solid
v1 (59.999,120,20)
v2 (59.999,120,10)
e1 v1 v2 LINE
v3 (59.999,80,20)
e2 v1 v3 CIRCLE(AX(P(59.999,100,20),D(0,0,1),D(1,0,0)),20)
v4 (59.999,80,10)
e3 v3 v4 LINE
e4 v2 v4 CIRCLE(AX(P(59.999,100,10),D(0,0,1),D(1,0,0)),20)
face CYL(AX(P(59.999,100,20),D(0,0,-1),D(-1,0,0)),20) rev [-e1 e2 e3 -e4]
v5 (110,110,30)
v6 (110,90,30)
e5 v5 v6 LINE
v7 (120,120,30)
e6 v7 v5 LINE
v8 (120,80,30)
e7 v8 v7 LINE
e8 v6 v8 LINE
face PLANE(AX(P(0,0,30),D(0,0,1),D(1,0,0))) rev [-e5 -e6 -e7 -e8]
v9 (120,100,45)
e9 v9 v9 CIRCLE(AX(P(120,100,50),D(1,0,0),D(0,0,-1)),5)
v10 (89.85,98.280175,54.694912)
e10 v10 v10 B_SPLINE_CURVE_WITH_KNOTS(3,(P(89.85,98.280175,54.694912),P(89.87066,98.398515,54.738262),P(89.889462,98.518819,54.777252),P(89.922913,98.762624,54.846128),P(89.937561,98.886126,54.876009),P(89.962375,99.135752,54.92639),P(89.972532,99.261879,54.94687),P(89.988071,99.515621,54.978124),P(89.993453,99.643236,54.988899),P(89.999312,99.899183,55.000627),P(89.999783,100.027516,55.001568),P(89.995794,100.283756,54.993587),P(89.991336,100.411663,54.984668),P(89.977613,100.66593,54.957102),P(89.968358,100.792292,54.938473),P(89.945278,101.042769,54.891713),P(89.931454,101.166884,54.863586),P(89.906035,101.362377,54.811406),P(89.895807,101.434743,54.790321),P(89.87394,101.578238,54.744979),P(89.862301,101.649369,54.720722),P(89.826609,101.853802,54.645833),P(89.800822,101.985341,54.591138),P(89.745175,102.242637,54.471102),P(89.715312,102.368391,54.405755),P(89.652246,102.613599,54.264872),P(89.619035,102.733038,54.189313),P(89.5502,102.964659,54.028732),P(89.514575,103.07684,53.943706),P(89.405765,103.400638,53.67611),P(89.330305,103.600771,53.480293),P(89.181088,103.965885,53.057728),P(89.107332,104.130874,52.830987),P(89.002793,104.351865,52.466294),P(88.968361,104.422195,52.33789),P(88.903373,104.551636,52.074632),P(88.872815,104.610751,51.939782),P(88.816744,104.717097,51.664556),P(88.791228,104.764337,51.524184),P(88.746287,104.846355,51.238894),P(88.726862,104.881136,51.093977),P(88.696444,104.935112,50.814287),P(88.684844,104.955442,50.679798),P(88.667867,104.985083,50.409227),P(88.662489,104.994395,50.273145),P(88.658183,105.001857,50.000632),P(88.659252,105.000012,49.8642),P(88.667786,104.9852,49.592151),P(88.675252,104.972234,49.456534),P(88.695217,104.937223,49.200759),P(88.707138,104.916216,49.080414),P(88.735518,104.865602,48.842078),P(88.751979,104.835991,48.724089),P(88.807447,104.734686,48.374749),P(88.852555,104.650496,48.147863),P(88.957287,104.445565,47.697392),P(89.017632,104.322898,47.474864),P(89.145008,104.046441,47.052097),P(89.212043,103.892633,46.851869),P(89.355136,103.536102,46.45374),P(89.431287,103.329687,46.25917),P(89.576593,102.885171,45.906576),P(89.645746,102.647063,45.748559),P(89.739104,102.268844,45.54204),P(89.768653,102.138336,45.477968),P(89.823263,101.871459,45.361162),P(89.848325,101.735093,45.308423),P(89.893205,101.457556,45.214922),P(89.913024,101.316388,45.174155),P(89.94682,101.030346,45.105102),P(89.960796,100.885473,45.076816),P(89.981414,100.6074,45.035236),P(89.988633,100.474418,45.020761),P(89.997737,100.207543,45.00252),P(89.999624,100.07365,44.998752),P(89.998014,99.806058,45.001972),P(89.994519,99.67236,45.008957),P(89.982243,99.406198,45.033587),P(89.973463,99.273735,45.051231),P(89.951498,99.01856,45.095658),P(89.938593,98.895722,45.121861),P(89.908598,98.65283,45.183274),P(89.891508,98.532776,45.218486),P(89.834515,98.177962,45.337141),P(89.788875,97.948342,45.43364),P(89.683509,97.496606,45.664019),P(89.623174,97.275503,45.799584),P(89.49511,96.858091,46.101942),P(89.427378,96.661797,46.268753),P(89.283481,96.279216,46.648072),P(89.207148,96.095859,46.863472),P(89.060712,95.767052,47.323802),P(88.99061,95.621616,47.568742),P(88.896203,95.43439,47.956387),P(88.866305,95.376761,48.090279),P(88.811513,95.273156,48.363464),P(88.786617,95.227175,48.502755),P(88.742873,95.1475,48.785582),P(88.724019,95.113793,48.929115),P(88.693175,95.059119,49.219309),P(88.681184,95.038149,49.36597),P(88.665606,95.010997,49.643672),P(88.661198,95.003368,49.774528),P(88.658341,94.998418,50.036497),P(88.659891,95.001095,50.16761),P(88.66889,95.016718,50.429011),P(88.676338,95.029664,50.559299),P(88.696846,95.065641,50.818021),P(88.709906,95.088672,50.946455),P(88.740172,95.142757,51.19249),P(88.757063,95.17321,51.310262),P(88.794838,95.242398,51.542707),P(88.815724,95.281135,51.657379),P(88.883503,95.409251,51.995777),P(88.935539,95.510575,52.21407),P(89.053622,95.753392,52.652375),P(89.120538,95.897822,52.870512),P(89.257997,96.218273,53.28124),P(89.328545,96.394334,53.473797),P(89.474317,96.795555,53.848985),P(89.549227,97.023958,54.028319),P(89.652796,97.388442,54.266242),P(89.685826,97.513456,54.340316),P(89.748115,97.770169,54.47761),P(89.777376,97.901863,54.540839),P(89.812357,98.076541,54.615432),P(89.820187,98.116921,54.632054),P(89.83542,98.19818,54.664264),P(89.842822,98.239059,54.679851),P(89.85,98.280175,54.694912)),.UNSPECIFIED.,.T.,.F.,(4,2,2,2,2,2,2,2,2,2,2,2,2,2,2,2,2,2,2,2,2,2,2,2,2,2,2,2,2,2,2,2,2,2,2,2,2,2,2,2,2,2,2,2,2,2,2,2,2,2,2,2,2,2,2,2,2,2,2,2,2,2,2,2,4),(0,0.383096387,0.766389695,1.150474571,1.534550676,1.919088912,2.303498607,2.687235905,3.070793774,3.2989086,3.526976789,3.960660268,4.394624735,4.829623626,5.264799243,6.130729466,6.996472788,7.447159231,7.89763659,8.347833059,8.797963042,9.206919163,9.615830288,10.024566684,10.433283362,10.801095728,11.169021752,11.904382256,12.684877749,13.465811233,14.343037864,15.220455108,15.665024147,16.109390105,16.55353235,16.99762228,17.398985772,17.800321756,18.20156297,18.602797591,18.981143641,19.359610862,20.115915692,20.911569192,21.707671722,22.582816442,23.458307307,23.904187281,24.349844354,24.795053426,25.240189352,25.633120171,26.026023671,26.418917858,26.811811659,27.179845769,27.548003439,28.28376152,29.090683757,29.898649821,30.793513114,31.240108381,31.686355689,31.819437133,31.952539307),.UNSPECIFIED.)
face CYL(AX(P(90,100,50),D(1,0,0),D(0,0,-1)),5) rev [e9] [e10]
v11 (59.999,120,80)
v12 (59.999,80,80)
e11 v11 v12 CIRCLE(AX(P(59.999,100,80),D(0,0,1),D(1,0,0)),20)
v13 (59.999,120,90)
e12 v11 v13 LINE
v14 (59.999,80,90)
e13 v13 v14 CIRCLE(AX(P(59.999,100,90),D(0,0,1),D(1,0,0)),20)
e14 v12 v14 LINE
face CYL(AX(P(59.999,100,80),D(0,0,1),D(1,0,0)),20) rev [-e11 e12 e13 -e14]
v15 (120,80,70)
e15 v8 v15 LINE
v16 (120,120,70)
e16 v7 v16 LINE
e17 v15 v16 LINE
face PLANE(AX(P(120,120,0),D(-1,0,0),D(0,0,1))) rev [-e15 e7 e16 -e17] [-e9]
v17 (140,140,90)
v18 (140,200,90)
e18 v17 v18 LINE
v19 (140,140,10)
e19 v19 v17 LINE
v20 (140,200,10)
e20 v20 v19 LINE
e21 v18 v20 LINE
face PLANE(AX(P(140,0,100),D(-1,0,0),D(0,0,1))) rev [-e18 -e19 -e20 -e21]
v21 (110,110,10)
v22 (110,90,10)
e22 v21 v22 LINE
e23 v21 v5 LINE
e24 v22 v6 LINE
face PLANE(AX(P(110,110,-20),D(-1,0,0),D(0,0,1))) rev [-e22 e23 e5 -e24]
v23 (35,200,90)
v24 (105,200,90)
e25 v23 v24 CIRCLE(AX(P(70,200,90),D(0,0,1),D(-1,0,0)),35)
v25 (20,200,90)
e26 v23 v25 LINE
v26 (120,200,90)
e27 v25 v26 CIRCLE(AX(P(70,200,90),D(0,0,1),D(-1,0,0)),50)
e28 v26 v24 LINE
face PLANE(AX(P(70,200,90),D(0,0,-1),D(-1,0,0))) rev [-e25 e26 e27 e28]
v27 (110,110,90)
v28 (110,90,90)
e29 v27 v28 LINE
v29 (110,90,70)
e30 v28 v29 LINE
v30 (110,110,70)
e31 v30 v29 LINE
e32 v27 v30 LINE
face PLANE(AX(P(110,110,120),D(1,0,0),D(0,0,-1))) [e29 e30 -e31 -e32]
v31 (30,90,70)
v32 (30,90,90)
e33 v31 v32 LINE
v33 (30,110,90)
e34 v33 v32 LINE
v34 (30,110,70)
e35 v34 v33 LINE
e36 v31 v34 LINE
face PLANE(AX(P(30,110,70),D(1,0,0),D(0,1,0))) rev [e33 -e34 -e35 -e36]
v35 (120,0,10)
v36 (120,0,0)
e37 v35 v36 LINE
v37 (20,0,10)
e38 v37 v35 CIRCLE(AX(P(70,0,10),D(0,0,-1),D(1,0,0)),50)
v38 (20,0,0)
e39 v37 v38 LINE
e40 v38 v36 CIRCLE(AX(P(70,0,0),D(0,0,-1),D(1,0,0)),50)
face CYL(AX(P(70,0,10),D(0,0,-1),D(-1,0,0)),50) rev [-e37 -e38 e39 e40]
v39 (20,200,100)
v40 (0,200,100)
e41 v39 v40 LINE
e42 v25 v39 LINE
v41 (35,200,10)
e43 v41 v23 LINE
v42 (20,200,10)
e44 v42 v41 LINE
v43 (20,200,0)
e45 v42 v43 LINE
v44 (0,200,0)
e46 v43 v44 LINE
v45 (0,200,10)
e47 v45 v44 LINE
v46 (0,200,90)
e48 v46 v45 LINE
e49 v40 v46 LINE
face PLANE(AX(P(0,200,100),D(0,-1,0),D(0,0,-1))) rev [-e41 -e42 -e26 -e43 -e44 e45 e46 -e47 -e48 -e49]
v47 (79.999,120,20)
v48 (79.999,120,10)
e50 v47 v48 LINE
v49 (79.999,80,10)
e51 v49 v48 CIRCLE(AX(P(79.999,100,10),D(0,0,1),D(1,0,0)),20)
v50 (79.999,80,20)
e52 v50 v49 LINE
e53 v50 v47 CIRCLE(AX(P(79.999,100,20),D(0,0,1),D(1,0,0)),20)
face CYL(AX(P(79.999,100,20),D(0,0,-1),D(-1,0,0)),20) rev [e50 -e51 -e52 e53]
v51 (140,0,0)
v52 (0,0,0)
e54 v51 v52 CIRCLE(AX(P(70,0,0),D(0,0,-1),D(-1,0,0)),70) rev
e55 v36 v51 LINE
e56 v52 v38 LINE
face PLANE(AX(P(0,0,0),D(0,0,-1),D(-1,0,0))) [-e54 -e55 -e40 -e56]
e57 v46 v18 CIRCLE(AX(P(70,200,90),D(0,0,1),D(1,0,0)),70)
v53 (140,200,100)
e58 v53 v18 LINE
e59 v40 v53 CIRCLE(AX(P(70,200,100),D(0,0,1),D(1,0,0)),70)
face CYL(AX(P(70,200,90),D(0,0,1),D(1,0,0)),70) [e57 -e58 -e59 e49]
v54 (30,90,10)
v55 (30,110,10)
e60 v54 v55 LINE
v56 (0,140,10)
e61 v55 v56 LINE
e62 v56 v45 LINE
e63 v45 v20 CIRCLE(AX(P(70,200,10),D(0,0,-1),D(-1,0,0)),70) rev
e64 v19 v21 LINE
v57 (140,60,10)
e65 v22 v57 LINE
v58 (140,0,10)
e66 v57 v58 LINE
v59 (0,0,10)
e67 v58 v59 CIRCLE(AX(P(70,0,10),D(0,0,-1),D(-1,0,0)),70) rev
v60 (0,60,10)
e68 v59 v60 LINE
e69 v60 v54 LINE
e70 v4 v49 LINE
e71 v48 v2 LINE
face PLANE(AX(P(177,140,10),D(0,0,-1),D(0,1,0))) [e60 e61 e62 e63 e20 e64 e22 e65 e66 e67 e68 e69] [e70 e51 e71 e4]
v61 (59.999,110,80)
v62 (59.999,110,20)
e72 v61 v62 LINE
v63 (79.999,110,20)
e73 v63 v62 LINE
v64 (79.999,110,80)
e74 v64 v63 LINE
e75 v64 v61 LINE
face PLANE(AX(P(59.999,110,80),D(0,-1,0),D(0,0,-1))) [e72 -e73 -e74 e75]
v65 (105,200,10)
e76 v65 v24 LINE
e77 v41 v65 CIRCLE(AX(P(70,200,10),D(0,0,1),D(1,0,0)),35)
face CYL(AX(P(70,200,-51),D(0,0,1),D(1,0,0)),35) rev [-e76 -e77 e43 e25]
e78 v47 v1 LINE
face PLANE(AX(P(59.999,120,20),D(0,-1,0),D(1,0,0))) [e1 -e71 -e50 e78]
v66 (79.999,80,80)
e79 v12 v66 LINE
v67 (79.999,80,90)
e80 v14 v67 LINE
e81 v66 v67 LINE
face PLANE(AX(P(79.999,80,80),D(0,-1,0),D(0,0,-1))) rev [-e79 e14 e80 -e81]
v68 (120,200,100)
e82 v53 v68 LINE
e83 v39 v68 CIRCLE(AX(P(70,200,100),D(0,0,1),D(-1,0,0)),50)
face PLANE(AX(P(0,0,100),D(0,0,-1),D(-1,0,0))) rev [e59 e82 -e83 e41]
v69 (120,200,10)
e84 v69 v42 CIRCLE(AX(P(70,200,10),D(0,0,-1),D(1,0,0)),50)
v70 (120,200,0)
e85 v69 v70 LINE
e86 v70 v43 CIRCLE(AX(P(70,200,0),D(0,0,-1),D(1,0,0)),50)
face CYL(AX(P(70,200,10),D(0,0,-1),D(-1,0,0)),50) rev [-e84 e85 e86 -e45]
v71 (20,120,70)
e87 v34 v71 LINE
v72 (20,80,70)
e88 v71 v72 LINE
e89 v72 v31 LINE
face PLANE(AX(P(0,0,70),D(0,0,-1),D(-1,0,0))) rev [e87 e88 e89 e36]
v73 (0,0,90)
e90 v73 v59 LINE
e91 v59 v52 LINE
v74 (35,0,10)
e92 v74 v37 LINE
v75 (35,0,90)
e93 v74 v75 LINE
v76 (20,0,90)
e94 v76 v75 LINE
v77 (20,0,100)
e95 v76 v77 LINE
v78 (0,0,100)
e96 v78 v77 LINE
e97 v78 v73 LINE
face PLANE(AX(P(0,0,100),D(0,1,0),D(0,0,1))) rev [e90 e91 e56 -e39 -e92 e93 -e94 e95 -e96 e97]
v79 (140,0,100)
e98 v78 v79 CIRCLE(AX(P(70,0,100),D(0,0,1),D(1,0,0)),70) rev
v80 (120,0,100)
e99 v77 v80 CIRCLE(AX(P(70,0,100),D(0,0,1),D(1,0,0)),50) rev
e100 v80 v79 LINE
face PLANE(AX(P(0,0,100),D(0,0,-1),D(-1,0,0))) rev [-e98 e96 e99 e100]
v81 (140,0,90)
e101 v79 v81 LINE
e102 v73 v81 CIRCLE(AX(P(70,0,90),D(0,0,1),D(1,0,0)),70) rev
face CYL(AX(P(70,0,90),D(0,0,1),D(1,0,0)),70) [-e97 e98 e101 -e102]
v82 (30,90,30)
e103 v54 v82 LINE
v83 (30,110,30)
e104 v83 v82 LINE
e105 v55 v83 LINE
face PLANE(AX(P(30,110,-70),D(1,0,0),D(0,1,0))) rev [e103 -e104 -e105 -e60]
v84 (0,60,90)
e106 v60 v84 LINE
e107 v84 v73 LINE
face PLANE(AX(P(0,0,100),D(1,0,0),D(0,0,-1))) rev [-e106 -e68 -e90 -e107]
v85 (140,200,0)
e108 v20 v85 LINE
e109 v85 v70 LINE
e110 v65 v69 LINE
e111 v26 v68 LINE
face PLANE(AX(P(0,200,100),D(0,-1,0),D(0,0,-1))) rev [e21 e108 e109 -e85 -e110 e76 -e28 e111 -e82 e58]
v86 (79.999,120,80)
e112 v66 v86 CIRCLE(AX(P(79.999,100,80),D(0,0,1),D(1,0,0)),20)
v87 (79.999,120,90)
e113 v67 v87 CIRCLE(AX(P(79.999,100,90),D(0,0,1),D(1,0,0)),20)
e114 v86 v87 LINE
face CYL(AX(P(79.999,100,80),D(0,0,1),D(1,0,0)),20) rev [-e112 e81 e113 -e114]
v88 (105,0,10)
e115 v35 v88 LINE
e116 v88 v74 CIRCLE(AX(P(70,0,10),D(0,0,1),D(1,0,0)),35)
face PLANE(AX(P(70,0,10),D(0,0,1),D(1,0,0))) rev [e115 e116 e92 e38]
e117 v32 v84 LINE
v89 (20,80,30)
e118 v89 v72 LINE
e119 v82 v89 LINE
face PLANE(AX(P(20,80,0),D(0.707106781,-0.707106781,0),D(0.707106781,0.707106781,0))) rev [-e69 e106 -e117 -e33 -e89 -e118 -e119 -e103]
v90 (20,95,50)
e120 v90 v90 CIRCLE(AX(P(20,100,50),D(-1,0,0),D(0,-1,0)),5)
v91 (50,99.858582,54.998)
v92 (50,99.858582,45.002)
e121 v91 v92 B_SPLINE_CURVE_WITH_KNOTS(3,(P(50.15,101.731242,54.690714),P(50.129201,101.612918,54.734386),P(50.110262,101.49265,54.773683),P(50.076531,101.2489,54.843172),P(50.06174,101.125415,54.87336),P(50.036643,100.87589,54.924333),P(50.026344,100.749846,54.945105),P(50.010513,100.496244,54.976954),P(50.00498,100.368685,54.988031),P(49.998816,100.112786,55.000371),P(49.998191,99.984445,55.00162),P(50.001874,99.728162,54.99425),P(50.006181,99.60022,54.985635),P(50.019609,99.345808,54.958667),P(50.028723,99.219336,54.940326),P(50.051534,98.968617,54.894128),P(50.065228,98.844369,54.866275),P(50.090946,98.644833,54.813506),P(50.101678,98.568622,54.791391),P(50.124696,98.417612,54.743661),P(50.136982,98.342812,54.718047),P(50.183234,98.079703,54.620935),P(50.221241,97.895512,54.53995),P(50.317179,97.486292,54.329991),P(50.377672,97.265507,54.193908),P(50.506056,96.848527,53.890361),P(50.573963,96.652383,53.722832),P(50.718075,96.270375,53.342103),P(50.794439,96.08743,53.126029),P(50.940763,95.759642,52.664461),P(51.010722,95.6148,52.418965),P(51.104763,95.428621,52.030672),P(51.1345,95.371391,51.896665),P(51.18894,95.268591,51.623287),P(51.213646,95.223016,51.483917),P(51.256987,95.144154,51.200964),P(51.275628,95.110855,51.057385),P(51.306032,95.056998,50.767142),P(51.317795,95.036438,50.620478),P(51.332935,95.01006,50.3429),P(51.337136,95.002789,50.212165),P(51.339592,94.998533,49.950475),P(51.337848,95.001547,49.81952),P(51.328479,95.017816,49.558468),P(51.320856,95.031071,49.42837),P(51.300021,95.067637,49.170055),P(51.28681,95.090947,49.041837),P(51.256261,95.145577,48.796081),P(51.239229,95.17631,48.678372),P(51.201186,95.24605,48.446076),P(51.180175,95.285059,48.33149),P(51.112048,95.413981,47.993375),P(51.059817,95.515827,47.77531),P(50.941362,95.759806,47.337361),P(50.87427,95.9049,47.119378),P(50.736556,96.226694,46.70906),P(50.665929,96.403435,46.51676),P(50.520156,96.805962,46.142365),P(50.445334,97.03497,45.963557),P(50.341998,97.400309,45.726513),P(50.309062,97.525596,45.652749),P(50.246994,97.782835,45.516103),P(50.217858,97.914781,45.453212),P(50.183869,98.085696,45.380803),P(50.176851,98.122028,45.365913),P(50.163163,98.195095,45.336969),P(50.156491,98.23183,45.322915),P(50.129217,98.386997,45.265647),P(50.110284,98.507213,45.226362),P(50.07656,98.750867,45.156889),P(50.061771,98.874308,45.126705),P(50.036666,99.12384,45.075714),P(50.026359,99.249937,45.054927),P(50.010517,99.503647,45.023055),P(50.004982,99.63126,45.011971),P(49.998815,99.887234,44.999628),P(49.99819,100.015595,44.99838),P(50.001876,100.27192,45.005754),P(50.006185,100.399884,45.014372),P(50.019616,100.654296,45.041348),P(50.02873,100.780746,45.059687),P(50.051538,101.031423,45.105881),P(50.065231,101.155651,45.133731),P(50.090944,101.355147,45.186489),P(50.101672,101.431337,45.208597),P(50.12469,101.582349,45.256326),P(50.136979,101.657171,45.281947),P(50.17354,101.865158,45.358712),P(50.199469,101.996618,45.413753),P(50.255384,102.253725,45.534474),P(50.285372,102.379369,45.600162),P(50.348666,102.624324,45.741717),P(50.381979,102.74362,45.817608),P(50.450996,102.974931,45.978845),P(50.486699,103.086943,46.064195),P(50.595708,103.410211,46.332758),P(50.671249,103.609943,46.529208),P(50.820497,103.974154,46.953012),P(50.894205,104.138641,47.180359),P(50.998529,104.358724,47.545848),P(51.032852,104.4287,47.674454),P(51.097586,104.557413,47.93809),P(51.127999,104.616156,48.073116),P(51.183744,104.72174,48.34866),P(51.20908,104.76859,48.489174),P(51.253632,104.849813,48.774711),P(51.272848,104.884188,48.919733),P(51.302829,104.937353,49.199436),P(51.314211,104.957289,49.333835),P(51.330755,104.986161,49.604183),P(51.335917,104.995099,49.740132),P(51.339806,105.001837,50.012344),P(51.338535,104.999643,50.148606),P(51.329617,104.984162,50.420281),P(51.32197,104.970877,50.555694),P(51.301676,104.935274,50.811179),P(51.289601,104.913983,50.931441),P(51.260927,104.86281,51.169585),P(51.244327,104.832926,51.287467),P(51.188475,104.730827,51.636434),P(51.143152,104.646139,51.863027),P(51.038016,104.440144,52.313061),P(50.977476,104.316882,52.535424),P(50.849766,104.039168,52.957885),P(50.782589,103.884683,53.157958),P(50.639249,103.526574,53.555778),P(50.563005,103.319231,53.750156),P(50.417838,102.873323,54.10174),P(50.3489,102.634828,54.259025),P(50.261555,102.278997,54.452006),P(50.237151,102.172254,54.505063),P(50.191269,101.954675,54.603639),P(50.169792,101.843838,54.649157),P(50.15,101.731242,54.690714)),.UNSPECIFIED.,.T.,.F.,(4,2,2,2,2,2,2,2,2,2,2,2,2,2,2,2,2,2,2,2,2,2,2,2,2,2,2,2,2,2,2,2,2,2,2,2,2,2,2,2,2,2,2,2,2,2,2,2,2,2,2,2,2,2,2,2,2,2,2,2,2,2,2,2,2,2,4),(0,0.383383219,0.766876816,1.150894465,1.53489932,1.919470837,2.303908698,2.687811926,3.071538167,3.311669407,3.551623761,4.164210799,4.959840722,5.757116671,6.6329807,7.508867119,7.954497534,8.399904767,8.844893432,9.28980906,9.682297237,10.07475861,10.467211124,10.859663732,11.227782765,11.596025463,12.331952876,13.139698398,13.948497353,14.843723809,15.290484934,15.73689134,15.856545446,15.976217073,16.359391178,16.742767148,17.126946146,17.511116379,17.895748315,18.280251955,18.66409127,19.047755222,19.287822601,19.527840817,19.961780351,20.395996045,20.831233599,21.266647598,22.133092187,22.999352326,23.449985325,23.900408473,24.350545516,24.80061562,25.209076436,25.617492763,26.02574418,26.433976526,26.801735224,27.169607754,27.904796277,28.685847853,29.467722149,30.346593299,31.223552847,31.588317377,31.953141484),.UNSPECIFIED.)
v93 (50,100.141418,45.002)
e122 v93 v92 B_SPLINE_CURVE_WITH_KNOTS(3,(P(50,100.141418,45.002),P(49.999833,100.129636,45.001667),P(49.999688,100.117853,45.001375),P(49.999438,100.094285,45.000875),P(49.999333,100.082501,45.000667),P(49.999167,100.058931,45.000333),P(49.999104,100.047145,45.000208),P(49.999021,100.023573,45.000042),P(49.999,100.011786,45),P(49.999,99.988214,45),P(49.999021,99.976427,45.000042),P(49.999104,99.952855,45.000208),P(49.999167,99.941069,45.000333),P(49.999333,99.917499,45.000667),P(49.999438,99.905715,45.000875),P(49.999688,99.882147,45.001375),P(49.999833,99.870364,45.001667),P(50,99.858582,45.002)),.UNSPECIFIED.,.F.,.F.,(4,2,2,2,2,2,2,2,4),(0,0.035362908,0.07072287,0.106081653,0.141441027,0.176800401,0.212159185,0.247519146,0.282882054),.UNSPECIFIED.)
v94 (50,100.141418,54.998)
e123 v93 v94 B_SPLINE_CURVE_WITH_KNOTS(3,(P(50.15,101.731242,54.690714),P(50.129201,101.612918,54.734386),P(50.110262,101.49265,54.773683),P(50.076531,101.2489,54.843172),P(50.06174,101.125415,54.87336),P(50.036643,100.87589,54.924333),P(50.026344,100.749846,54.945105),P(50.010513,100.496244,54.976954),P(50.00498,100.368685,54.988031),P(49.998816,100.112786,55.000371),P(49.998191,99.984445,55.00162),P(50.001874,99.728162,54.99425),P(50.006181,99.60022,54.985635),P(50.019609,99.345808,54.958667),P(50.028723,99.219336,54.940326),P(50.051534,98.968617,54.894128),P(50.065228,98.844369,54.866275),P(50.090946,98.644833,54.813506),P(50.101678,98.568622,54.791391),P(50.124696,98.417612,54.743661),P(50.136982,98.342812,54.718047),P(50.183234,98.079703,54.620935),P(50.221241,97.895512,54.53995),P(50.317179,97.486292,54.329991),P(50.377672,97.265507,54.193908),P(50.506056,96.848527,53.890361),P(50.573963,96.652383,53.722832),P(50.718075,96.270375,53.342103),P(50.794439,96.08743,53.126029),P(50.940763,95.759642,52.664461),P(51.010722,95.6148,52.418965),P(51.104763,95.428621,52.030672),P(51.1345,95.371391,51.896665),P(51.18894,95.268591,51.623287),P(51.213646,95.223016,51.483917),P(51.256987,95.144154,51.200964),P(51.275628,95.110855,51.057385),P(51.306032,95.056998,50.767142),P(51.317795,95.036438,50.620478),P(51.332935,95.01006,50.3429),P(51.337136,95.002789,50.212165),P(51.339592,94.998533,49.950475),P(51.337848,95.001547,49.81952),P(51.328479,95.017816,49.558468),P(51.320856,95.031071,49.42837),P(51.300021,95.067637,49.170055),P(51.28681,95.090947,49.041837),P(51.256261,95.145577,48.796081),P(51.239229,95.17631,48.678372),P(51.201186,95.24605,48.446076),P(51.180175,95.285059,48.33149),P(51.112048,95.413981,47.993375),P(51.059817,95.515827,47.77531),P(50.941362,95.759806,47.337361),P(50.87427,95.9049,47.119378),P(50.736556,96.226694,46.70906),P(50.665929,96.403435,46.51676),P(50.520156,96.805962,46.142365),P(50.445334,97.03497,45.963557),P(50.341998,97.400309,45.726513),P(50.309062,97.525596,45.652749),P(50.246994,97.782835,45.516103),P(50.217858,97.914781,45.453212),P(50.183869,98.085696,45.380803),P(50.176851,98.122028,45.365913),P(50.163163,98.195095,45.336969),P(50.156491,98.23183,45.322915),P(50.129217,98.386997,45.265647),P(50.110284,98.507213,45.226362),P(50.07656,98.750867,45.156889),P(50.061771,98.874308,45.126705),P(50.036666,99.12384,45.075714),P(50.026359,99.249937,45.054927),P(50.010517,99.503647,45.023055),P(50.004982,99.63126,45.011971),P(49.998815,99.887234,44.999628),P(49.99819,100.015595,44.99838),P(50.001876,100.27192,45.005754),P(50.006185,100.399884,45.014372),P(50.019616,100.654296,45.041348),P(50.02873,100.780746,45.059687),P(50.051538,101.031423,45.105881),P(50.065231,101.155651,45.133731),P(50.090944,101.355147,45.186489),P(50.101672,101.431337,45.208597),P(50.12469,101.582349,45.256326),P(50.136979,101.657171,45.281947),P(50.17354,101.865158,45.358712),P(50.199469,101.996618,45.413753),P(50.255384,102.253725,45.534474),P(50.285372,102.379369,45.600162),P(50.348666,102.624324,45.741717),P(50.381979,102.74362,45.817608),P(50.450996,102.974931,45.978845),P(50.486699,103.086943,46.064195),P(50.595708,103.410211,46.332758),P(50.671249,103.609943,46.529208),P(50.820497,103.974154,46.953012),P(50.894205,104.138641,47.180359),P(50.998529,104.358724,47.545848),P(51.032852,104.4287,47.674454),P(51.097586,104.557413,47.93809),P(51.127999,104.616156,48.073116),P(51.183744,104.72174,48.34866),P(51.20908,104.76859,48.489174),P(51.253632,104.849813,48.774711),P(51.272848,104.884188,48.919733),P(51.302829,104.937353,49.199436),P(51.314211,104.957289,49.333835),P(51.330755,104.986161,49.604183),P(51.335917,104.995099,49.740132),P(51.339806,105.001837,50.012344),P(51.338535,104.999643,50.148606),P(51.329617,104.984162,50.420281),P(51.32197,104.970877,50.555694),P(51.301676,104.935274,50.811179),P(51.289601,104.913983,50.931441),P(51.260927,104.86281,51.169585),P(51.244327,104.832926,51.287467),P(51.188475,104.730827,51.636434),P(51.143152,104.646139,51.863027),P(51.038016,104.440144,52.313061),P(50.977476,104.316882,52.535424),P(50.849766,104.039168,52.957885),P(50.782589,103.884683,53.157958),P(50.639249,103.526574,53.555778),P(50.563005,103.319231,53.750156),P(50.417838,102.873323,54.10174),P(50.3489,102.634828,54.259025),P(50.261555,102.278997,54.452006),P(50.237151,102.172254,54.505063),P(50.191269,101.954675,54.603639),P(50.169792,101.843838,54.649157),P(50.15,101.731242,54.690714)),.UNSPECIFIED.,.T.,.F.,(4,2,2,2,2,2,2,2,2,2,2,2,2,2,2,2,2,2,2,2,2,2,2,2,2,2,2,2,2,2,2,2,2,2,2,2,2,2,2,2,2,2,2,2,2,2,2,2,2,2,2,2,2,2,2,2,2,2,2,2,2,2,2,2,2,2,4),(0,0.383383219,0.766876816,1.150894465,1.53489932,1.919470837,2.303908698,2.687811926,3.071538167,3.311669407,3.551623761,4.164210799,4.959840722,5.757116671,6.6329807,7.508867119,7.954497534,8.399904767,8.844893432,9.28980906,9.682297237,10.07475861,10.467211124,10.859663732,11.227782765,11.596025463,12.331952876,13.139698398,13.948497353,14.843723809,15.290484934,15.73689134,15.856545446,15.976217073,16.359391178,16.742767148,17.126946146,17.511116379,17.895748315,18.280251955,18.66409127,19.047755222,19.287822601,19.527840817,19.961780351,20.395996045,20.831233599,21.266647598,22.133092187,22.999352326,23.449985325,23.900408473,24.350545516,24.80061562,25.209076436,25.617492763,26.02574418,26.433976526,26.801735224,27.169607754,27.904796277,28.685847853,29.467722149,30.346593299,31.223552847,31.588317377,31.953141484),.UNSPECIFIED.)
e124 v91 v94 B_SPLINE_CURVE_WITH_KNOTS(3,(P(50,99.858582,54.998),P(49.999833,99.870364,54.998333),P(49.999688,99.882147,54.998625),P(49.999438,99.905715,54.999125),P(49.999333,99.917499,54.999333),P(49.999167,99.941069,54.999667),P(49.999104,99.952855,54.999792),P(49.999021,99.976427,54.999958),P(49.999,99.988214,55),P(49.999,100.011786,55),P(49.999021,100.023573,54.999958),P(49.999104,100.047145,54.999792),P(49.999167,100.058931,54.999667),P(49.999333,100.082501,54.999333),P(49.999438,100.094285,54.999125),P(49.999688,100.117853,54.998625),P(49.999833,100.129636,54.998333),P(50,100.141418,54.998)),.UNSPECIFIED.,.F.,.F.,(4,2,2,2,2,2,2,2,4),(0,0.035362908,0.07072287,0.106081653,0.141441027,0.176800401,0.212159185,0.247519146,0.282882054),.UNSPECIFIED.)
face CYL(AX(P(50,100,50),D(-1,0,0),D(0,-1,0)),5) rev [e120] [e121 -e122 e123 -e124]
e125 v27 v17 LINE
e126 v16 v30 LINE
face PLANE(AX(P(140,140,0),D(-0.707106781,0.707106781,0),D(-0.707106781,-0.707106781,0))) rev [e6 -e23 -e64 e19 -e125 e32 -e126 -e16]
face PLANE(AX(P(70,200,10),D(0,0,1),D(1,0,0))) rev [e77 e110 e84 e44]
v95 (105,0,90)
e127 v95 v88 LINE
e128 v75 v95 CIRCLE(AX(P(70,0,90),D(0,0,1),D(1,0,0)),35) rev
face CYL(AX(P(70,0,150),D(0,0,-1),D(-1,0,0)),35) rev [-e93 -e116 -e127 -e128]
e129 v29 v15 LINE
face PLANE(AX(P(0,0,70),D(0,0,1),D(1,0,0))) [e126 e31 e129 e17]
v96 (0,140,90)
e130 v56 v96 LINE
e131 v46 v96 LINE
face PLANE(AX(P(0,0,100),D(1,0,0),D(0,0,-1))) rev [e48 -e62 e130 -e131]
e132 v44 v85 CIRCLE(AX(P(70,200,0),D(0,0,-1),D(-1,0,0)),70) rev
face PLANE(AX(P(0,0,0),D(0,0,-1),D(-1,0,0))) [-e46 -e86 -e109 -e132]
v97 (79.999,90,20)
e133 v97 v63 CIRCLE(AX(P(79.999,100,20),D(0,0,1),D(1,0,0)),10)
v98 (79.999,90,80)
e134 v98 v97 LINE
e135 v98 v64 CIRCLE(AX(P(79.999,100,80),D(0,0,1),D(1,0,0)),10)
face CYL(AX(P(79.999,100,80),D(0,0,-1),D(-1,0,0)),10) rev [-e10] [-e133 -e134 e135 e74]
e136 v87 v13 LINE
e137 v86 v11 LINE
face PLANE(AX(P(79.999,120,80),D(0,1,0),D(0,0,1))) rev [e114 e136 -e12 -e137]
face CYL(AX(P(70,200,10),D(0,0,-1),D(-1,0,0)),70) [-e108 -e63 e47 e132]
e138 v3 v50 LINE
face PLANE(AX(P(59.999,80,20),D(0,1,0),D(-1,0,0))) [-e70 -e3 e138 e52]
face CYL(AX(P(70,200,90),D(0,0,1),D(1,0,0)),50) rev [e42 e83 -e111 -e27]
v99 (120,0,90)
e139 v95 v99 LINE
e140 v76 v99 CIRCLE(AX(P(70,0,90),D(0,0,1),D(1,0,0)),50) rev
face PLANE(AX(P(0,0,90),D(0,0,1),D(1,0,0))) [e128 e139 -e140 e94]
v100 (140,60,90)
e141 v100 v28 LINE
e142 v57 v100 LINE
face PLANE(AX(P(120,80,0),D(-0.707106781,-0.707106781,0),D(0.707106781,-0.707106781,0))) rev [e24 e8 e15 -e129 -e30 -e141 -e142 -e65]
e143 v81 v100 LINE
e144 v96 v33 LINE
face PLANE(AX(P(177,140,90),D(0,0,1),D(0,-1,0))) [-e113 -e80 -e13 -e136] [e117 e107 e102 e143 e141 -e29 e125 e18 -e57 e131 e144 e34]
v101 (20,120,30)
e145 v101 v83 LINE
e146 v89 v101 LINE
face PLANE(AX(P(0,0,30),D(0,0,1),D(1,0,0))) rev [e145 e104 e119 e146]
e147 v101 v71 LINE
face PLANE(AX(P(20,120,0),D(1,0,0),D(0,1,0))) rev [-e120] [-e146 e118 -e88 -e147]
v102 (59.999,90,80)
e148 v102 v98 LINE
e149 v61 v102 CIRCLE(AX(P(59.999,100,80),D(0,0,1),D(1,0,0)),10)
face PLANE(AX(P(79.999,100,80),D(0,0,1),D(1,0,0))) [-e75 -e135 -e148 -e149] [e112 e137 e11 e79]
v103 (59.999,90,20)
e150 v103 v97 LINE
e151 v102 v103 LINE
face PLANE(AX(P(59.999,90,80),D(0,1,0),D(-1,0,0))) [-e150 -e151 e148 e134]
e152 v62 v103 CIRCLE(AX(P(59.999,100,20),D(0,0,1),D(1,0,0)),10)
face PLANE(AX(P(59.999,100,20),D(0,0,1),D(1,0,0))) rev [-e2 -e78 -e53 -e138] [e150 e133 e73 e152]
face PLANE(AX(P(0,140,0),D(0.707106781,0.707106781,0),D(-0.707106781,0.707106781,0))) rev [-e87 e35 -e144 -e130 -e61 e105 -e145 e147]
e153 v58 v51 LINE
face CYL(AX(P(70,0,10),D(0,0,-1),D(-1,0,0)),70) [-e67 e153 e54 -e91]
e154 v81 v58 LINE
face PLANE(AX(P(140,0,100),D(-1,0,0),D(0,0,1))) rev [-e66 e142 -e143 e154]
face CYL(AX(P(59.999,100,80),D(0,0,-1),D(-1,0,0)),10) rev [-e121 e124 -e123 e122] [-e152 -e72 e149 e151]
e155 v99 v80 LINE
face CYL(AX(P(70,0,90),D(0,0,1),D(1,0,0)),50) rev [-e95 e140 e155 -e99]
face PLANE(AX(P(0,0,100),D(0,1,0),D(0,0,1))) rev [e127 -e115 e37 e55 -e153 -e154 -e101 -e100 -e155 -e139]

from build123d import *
from build123d.topology import SkipClean

# Parameters (mm, degrees)
SKETCH1_W           = 140
SKETCH1_H           = 200
BOSS_EXTRUDE1_DEPTH = 100
CUT_EXTRUDE1_DEPTH  = 100
CUT_EXTRUDE2_DEPTH  = 100
BOSS_EXTRUDE2_DEPTH = 10
CUT_EXTRUDE7_DEPTH  = 30
CUT_EXTRUDE8_DEPTH  = 10
CUT_EXTRUDE9_DEPTH  = 50
CUT_EXTRUDE10_DEPTH = 50
CUT_EXTRUDE11_DEPTH = 10
CUT_EXTRUDE12_START = -10
CUT_EXTRUDE12_DEPTH = 10
CUT_EXTRUDE13_DEPTH = 141
SKETCH19_R          = 5
CUT_EXTRUDE16_DEPTH = 30
CUT_EXTRUDE18_DEPTH = 60
CUT_EXTRUDE19_DEPTH = 10
SKETCH27_W          = 10
SKETCH27_H          = 80
CUT_EXTRUDE25_DEPTH = 177
CUT_EXTRUDE26_DEPTH = 10
SKETCH29_W          = 72.11102551
SKETCH29_H          = 10
EXTRUDE_THIN1_DEPTH = 10
CUT_EXTRUDE27_START = -10
CUT_EXTRUDE27_DEPTH = 10
BOSS_EXTRUDE4_START = -10
BOSS_EXTRUDE4_DEPTH = 10
CUT_EXTRUDE28_DEPTH = 150
CUT_EXTRUDE29_DEPTH = 10
BOSS_EXTRUDE5_DEPTH = 10
CUT_EXTRUDE30_START = -10
CUT_EXTRUDE30_DEPTH = 10
CUT_EXTRUDE31_START = -10
CUT_EXTRUDE31_DEPTH = 10
BOSS_EXTRUDE6_START = -10
BOSS_EXTRUDE6_DEPTH = 10
CUT_EXTRUDE32_DEPTH = 10
CUT_EXTRUDE33_DEPTH = 49
CUT_EXTRUDE34_START = -10
CUT_EXTRUDE34_DEPTH = 10
CUT_EXTRUDE42_START = -30.15
SKETCH43_R          = 5
CUT_EXTRUDE42_DEPTH = 30.15
SKETCH44_R          = 5
CUT_EXTRUDE43_DEPTH = 30.15
SKETCH45_R          = 5
CUT_EXTRUDE44_DEPTH = 120


with BuildPart() as part:
    # Sketch1 → Boss-Extrude1 (new body)
    with BuildSketch(Plane.XY):
        with Locations((70, 100)):
            Rectangle(SKETCH1_W, SKETCH1_H)
    extrude(amount=BOSS_EXTRUDE1_DEPTH)

    # Sketch2 → Cut-Extrude1 (cut)
    with BuildSketch(Plane.XY.offset(100)):
        Polygon((0, 140), (20, 120), (20, 80), (0, 60), align=None)
        Polygon((140, 140), (120, 120), (120, 80), (140, 60), align=None)
    extrude(amount=-CUT_EXTRUDE1_DEPTH, mode=Mode.SUBTRACT)

    # Sketch4 → Cut-Extrude2 (cut)
    with BuildSketch(Plane.XY.offset(30)):
        Polygon((20, 120), (30, 110), (30, 90), (20, 80), align=None)
    extrude(amount=-CUT_EXTRUDE2_DEPTH, mode=Mode.SUBTRACT)

    # Sketch9 → Boss-Extrude2 (add)
    with BuildSketch(Plane(origin=(0, 0, 30), x_dir=(-1, 0, 0), z_dir=(0, 0, -1))):
        Polygon((-30, 110), (-20, 120), (-20, 80), (-30, 90), align=None)
    extrude(amount=BOSS_EXTRUDE2_DEPTH)

    # Sketch10 → Cut-Extrude7 (cut)
    with BuildSketch(Plane.XY.offset(100)):
        Polygon((20, 120), (30, 110), (30, 90), (20, 80), align=None)
    extrude(amount=-CUT_EXTRUDE7_DEPTH, mode=Mode.SUBTRACT)

    # Sketch11 → Cut-Extrude8 (cut)
    with BuildSketch(Plane(origin=(0, 0, 20), x_dir=(-1, 0, 0), z_dir=(0, 0, -1))):
        Polygon((-30, 110), (-20, 120), (-20, 80), (-30, 90), align=None)
    extrude(amount=-CUT_EXTRUDE8_DEPTH, mode=Mode.SUBTRACT)

    # Sketch13 → Cut-Extrude9 (cut)
    with BuildSketch(Plane.XY.offset(70)):
        Polygon((120, 120), (110, 110), (110, 90), (120, 80), align=None)
    extrude(amount=CUT_EXTRUDE9_DEPTH, mode=Mode.SUBTRACT)

    # Sketch14 → Cut-Extrude10 (cut)
    with BuildSketch(Plane.XY.offset(30)):
        Polygon((120, 120), (110, 110), (110, 90), (120, 80), align=None)
    extrude(amount=-CUT_EXTRUDE10_DEPTH, mode=Mode.SUBTRACT)

    # Sketch15 → Cut-Extrude11 (cut)
    with BuildSketch(Plane(origin=(0, 0, 0), x_dir=(-1, 0, 0), z_dir=(0, 0, -1))):
        with BuildLine():
            Line((-120, 200), (-20, 200))
            ThreePointArc((-20, 200), (-70, 150), (-120, 200))
        make_face()
    extrude(amount=-CUT_EXTRUDE11_DEPTH, mode=Mode.SUBTRACT)

    # Sketch16 → Cut-Extrude12 (cut)
    with BuildSketch(Plane.XY.offset(100).offset(CUT_EXTRUDE12_START)):
        with BuildLine():
            Line((20, 200), (120, 200))
            ThreePointArc((120, 200), (70, 150), (20, 200))
        make_face()
    extrude(amount=CUT_EXTRUDE12_DEPTH, mode=Mode.SUBTRACT)

    # Sketch17 → Cut-Extrude13 (cut)
    with BuildSketch(Plane.XY.offset(90)):
        with BuildLine():
            Line((35, 200), (105, 200))
            ThreePointArc((105, 200), (70, 165), (35, 200))
        make_face()
    extrude(amount=-CUT_EXTRUDE13_DEPTH, mode=Mode.SUBTRACT)

    # Sketch19 → Cut-Extrude16 (cut)
    with BuildSketch(Plane(origin=(120, 0, 0), x_dir=(0, 0, -1), z_dir=(1, 0, 0))):
        with Locations((-50, 100)):
            Circle(SKETCH19_R)
    extrude(amount=-CUT_EXTRUDE16_DEPTH, mode=Mode.SUBTRACT)

    # Sketch20 → Cut-Extrude18 (cut)
    with BuildSketch(Plane.XY.offset(20)):
        with BuildLine():
            Line((59.999, 110), (79.999, 110))
            ThreePointArc((79.999, 110), (89.999, 100), (79.999, 90))
            Line((79.999, 90), (59.999, 90))
            ThreePointArc((59.999, 90), (49.999, 100), (59.999, 110))
        make_face()
    extrude(amount=CUT_EXTRUDE18_DEPTH, mode=Mode.SUBTRACT)

    # Sketch21 → Cut-Extrude19 (cut)
    with BuildSketch(Plane.XY.offset(10)):
        with BuildLine():
            Line((59.999, 120), (79.999, 120))
            ThreePointArc((79.999, 120), (99.999, 100), (79.999, 80))
            Line((79.999, 80), (59.999, 80))
            ThreePointArc((59.999, 80), (39.999, 100), (59.999, 120))
        make_face()
    extrude(amount=CUT_EXTRUDE19_DEPTH, mode=Mode.SUBTRACT)

    # Sketch27 → Cut-Extrude25 (cut)
    with BuildSketch(Plane(origin=(0, 0, 0), x_dir=(0, 0, -1), z_dir=(1, 0, 0))):
        with Locations((-95, 100)):
            Rectangle(SKETCH27_W, SKETCH27_H)
        with Locations((-5, 100)):
            Rectangle(SKETCH27_W, SKETCH27_H)
    extrude(amount=CUT_EXTRUDE25_DEPTH, mode=Mode.SUBTRACT)

    # Sketch28 → Cut-Extrude26 (cut)
    with BuildSketch(Plane.XY.offset(100)):
        with BuildLine():
            ThreePointArc((33.944487245, 140), (9.074283374, 165.531796484), (0, 200))
            Line((0, 200), (0, 140))
            Line((0, 140), (33.944487245, 140))
        make_face()
        with BuildLine():
            ThreePointArc((140, 200), (130.925716626, 165.531796484), (106.055512755, 140))
            Line((106.055512755, 140), (140, 140))
            Line((140, 140), (140, 200))
        make_face()
    extrude(amount=-CUT_EXTRUDE26_DEPTH, mode=Mode.SUBTRACT)

    # Sketch29 → Extrude-Thin1 (add)
    with BuildSketch(Plane.XY.offset(100)):
        with Locations((70, 145)):
            Rectangle(SKETCH29_W, SKETCH29_H)
        with BuildLine():
            ThreePointArc((140, 200), (70, 130), (0, 200))
            Line((0, 200), (10, 200))
            ThreePointArc((10, 200), (70, 140), (130, 200))
            Line((130, 200), (140, 200))
        make_face()
    extrude(amount=-EXTRUDE_THIN1_DEPTH)

    # Sketch30 → Cut-Extrude27 (cut)
    with BuildSketch(Plane(origin=(0, 0, 0), x_dir=(-1, 0, 0), z_dir=(0, 0, -1)).offset(CUT_EXTRUDE27_START)):
        with BuildLine():
            ThreePointArc((-106.055512755, 140), (-130.925716626, 165.531796484), (-140, 200))
            Line((-140, 200), (-140, 140))
            Line((-140, 140), (-106.055512755, 140))
        make_face()
        with BuildLine():
            ThreePointArc((0, 200), (-9.074283374, 165.531796484), (-33.944487245, 140))
            Line((-33.944487245, 140), (0, 140))
            Line((0, 140), (0, 200))
        make_face()
    extrude(amount=CUT_EXTRUDE27_DEPTH, mode=Mode.SUBTRACT)

    # Sketch31 → Boss-Extrude4 (add)
    with BuildSketch(Plane(origin=(0, 0, 0), x_dir=(-1, 0, 0), z_dir=(0, 0, -1)).offset(BOSS_EXTRUDE4_START)):
        with BuildLine():
            Line((0, 200), (-20, 200))
            ThreePointArc((-20, 200), (-70, 150), (-120, 200))
            Line((-120, 200), (-140, 200))
            ThreePointArc((-140, 200), (-70, 130), (0, 200))
        make_face()
    extrude(amount=BOSS_EXTRUDE4_DEPTH)

    # Sketch32 → Cut-Extrude28 (cut)
    with BuildSketch(Plane(origin=(0, 0, 0), x_dir=(-1, 0, 0), z_dir=(0, 0, -1))):
        with BuildLine():
            Line((-105, 0), (-35, 0))
            ThreePointArc((-35, 0), (-70, 35), (-105, 0))
        make_face()
    extrude(amount=-CUT_EXTRUDE28_DEPTH, mode=Mode.SUBTRACT)

    # Sketch33 → Cut-Extrude29 (cut)
    with BuildSketch(Plane.XY.offset(100)):
        with BuildLine():
            Line((0, 60), (0, 0))
            ThreePointArc((0, 0), (9.074283374, 34.468203516), (33.944487245, 60))
            Line((33.944487245, 60), (0, 60))
        make_face()
        with BuildLine():
            ThreePointArc((106.055512755, 60), (130.925716626, 34.468203516), (140, 0))
            Line((140, 0), (140, 60))
            Line((140, 60), (106.055512755, 60))
        make_face()
    extrude(amount=-CUT_EXTRUDE29_DEPTH, mode=Mode.SUBTRACT)

    # Sketch34 → Boss-Extrude5 (add)
    with SkipClean():  # the faces are left unmerged after this step: merging them gives an invalid solid
        with BuildSketch(Plane.XY.offset(100)):
            with BuildLine():
                Line((105, 0), (140, 0))
                ThreePointArc((140, 0), (70, 70), (0, 0))
                Line((0, 0), (35, 0))
                ThreePointArc((35, 0), (70, 35), (105, 0))
            make_face()
        extrude(amount=-BOSS_EXTRUDE5_DEPTH)

    # Sketch35 → Cut-Extrude30 (cut)
    with SkipClean():  # the faces are left unmerged after this step: merging them gives an invalid solid
        with BuildSketch(Plane.XY.offset(100).offset(CUT_EXTRUDE30_START)):
            with BuildLine():
                ThreePointArc((120, 0), (70, 50), (20, 0))
                Line((20, 0), (35, 0))
                ThreePointArc((35, 0), (70, 35), (105, 0))
                Line((105, 0), (120, 0))
            make_face()
        extrude(amount=CUT_EXTRUDE30_DEPTH, mode=Mode.SUBTRACT)

    # Sketch36 → Cut-Extrude31 (cut)
    with SkipClean():  # the faces are left unmerged after this step: merging them gives an invalid solid
        with BuildSketch(Plane(origin=(0, 0, 0), x_dir=(-1, 0, 0), z_dir=(0, 0, -1)).offset(CUT_EXTRUDE31_START)):
            with BuildLine():
                Line((-140, 60), (-140, 0))
                ThreePointArc((-140, 0), (-130.925716626, 34.468203516), (-106.055512755, 60))
                Line((-106.055512755, 60), (-140, 60))
            make_face()
            with BuildLine():
                Line((0, 60), (-33.944487245, 60))
                ThreePointArc((-33.944487245, 60), (-9.074283374, 34.468203516), (0, 0))
                Line((0, 0), (0, 60))
            make_face()
        extrude(amount=CUT_EXTRUDE31_DEPTH, mode=Mode.SUBTRACT)

    # Sketch37 → Boss-Extrude6 (add)
    with SkipClean():  # the faces are left unmerged after this step: merging them gives an invalid solid
        with BuildSketch(Plane(origin=(0, 0, 0), x_dir=(-1, 0, 0), z_dir=(0, 0, -1)).offset(BOSS_EXTRUDE6_START)):
            with BuildLine():
                Line((-105, 0), (-140, 0))
                ThreePointArc((-140, 0), (-70, 70), (0, 0))
                Line((0, 0), (-35, 0))
                ThreePointArc((-35, 0), (-70, 35), (-105, 0))
            make_face()
        extrude(amount=BOSS_EXTRUDE6_DEPTH)

    # Sketch38 → Cut-Extrude32 (cut)
    with SkipClean():  # the faces are left unmerged after this step: merging them gives an invalid solid
        with BuildSketch(Plane(origin=(0, 0, 0), x_dir=(-1, 0, 0), z_dir=(0, 0, -1))):
            with BuildLine():
                Line((-120, 0), (-105, 0))
                ThreePointArc((-105, 0), (-70, 35), (-35, 0))
                Line((-35, 0), (-20, 0))
                ThreePointArc((-20, 0), (-70, 50), (-120, 0))
            make_face()
        extrude(amount=-CUT_EXTRUDE32_DEPTH, mode=Mode.SUBTRACT)

    # Sketch39 → Cut-Extrude33 (cut)
    with SkipClean():  # the faces are left unmerged after this step: merging them gives an invalid solid
        with BuildSketch(Plane(origin=(0, 0, 80), x_dir=(-1, 0, 0), z_dir=(0, 0, -1))):
            with BuildLine():
                Line((-79.999, 110), (-59.999, 110))
                ThreePointArc((-59.999, 110), (-49.999, 100), (-59.999, 90))
                Line((-59.999, 90), (-79.999, 90))
                ThreePointArc((-79.999, 90), (-89.999, 100), (-79.999, 110))
            make_face()
        extrude(amount=-CUT_EXTRUDE33_DEPTH, mode=Mode.SUBTRACT)

    # Sketch40 → Cut-Extrude34 (cut)
    with SkipClean():  # the faces are left unmerged after this step: merging them gives an invalid solid
        with BuildSketch(Plane.XY.offset(90).offset(CUT_EXTRUDE34_START)):
            with BuildLine():
                Line((79.999, 80), (59.999, 80))
                ThreePointArc((59.999, 80), (39.999, 100), (59.999, 120))
                Line((59.999, 120), (79.999, 120))
                ThreePointArc((79.999, 120), (99.999, 100), (79.999, 80))
            make_face()
        extrude(amount=CUT_EXTRUDE34_DEPTH, mode=Mode.SUBTRACT)

    # Cut-Extrude15: read off the stored shape, not the designer's step
    # Cut-Extrude15: loft between two sections, ruled curve by curve
    with SkipClean():  # the faces are left unmerged after this step: merging them gives an invalid solid
        cut_extrude15_from = [
            Edge.make_three_point_arc((50, 95, 50), (50, 100, 55), (50, 105, 50)),
            Edge.make_three_point_arc((50, 105, 50), (50, 100, 45), (50, 95, 50)),
        ]
        cut_extrude15_to = [
            Edge.make_three_point_arc((20, 95, 50), (20, 100, 55), (20, 105, 50)),
            Edge.make_three_point_arc((20, 105, 50), (20, 100, 45), (20, 95, 50)),
        ]
        cut_extrude15 = Solid(Shell([*[Face.make_surface_from_curves(cut_extrude15_from[k], cut_extrude15_to[k]) for k in range(2)], Face(Wire(cut_extrude15_from)), Face(Wire(cut_extrude15_to))]))
        add(cut_extrude15, mode=Mode.SUBTRACT)

    # Sketch43 → Cut-Extrude42 (cut)
    with SkipClean():  # the faces are left unmerged after this step: merging them gives an invalid solid
        with BuildSketch(Plane.ZY.offset(-20).offset(CUT_EXTRUDE42_START)):
            with Locations(Location((50, 100, 0), (0, 0, 180))):
                Circle(SKETCH43_R)
        extrude(amount=CUT_EXTRUDE42_DEPTH, mode=Mode.SUBTRACT)

    # Sketch44 → Cut-Extrude43 (cut)
    with SkipClean():  # the faces are left unmerged after this step: merging them gives an invalid solid
        with BuildSketch(Plane(origin=(120, 0, 0), x_dir=(0, 0, -1), z_dir=(1, 0, 0))):
            with Locations((-50, 100)):
                Circle(SKETCH44_R)
        extrude(amount=-CUT_EXTRUDE43_DEPTH, mode=Mode.SUBTRACT)

    # Sketch45 → Cut-Extrude44 (cut)
    with SkipClean():  # the faces are left unmerged after this step: merging them gives an invalid solid
        with BuildSketch(Plane(origin=(120, 0, 0), x_dir=(0, 0, -1), z_dir=(1, 0, 0))):
            with Locations((-50, 100)):
                Circle(SKETCH45_R)
        extrude(amount=-CUT_EXTRUDE44_DEPTH, mode=Mode.SUBTRACT)


solid = part.part
